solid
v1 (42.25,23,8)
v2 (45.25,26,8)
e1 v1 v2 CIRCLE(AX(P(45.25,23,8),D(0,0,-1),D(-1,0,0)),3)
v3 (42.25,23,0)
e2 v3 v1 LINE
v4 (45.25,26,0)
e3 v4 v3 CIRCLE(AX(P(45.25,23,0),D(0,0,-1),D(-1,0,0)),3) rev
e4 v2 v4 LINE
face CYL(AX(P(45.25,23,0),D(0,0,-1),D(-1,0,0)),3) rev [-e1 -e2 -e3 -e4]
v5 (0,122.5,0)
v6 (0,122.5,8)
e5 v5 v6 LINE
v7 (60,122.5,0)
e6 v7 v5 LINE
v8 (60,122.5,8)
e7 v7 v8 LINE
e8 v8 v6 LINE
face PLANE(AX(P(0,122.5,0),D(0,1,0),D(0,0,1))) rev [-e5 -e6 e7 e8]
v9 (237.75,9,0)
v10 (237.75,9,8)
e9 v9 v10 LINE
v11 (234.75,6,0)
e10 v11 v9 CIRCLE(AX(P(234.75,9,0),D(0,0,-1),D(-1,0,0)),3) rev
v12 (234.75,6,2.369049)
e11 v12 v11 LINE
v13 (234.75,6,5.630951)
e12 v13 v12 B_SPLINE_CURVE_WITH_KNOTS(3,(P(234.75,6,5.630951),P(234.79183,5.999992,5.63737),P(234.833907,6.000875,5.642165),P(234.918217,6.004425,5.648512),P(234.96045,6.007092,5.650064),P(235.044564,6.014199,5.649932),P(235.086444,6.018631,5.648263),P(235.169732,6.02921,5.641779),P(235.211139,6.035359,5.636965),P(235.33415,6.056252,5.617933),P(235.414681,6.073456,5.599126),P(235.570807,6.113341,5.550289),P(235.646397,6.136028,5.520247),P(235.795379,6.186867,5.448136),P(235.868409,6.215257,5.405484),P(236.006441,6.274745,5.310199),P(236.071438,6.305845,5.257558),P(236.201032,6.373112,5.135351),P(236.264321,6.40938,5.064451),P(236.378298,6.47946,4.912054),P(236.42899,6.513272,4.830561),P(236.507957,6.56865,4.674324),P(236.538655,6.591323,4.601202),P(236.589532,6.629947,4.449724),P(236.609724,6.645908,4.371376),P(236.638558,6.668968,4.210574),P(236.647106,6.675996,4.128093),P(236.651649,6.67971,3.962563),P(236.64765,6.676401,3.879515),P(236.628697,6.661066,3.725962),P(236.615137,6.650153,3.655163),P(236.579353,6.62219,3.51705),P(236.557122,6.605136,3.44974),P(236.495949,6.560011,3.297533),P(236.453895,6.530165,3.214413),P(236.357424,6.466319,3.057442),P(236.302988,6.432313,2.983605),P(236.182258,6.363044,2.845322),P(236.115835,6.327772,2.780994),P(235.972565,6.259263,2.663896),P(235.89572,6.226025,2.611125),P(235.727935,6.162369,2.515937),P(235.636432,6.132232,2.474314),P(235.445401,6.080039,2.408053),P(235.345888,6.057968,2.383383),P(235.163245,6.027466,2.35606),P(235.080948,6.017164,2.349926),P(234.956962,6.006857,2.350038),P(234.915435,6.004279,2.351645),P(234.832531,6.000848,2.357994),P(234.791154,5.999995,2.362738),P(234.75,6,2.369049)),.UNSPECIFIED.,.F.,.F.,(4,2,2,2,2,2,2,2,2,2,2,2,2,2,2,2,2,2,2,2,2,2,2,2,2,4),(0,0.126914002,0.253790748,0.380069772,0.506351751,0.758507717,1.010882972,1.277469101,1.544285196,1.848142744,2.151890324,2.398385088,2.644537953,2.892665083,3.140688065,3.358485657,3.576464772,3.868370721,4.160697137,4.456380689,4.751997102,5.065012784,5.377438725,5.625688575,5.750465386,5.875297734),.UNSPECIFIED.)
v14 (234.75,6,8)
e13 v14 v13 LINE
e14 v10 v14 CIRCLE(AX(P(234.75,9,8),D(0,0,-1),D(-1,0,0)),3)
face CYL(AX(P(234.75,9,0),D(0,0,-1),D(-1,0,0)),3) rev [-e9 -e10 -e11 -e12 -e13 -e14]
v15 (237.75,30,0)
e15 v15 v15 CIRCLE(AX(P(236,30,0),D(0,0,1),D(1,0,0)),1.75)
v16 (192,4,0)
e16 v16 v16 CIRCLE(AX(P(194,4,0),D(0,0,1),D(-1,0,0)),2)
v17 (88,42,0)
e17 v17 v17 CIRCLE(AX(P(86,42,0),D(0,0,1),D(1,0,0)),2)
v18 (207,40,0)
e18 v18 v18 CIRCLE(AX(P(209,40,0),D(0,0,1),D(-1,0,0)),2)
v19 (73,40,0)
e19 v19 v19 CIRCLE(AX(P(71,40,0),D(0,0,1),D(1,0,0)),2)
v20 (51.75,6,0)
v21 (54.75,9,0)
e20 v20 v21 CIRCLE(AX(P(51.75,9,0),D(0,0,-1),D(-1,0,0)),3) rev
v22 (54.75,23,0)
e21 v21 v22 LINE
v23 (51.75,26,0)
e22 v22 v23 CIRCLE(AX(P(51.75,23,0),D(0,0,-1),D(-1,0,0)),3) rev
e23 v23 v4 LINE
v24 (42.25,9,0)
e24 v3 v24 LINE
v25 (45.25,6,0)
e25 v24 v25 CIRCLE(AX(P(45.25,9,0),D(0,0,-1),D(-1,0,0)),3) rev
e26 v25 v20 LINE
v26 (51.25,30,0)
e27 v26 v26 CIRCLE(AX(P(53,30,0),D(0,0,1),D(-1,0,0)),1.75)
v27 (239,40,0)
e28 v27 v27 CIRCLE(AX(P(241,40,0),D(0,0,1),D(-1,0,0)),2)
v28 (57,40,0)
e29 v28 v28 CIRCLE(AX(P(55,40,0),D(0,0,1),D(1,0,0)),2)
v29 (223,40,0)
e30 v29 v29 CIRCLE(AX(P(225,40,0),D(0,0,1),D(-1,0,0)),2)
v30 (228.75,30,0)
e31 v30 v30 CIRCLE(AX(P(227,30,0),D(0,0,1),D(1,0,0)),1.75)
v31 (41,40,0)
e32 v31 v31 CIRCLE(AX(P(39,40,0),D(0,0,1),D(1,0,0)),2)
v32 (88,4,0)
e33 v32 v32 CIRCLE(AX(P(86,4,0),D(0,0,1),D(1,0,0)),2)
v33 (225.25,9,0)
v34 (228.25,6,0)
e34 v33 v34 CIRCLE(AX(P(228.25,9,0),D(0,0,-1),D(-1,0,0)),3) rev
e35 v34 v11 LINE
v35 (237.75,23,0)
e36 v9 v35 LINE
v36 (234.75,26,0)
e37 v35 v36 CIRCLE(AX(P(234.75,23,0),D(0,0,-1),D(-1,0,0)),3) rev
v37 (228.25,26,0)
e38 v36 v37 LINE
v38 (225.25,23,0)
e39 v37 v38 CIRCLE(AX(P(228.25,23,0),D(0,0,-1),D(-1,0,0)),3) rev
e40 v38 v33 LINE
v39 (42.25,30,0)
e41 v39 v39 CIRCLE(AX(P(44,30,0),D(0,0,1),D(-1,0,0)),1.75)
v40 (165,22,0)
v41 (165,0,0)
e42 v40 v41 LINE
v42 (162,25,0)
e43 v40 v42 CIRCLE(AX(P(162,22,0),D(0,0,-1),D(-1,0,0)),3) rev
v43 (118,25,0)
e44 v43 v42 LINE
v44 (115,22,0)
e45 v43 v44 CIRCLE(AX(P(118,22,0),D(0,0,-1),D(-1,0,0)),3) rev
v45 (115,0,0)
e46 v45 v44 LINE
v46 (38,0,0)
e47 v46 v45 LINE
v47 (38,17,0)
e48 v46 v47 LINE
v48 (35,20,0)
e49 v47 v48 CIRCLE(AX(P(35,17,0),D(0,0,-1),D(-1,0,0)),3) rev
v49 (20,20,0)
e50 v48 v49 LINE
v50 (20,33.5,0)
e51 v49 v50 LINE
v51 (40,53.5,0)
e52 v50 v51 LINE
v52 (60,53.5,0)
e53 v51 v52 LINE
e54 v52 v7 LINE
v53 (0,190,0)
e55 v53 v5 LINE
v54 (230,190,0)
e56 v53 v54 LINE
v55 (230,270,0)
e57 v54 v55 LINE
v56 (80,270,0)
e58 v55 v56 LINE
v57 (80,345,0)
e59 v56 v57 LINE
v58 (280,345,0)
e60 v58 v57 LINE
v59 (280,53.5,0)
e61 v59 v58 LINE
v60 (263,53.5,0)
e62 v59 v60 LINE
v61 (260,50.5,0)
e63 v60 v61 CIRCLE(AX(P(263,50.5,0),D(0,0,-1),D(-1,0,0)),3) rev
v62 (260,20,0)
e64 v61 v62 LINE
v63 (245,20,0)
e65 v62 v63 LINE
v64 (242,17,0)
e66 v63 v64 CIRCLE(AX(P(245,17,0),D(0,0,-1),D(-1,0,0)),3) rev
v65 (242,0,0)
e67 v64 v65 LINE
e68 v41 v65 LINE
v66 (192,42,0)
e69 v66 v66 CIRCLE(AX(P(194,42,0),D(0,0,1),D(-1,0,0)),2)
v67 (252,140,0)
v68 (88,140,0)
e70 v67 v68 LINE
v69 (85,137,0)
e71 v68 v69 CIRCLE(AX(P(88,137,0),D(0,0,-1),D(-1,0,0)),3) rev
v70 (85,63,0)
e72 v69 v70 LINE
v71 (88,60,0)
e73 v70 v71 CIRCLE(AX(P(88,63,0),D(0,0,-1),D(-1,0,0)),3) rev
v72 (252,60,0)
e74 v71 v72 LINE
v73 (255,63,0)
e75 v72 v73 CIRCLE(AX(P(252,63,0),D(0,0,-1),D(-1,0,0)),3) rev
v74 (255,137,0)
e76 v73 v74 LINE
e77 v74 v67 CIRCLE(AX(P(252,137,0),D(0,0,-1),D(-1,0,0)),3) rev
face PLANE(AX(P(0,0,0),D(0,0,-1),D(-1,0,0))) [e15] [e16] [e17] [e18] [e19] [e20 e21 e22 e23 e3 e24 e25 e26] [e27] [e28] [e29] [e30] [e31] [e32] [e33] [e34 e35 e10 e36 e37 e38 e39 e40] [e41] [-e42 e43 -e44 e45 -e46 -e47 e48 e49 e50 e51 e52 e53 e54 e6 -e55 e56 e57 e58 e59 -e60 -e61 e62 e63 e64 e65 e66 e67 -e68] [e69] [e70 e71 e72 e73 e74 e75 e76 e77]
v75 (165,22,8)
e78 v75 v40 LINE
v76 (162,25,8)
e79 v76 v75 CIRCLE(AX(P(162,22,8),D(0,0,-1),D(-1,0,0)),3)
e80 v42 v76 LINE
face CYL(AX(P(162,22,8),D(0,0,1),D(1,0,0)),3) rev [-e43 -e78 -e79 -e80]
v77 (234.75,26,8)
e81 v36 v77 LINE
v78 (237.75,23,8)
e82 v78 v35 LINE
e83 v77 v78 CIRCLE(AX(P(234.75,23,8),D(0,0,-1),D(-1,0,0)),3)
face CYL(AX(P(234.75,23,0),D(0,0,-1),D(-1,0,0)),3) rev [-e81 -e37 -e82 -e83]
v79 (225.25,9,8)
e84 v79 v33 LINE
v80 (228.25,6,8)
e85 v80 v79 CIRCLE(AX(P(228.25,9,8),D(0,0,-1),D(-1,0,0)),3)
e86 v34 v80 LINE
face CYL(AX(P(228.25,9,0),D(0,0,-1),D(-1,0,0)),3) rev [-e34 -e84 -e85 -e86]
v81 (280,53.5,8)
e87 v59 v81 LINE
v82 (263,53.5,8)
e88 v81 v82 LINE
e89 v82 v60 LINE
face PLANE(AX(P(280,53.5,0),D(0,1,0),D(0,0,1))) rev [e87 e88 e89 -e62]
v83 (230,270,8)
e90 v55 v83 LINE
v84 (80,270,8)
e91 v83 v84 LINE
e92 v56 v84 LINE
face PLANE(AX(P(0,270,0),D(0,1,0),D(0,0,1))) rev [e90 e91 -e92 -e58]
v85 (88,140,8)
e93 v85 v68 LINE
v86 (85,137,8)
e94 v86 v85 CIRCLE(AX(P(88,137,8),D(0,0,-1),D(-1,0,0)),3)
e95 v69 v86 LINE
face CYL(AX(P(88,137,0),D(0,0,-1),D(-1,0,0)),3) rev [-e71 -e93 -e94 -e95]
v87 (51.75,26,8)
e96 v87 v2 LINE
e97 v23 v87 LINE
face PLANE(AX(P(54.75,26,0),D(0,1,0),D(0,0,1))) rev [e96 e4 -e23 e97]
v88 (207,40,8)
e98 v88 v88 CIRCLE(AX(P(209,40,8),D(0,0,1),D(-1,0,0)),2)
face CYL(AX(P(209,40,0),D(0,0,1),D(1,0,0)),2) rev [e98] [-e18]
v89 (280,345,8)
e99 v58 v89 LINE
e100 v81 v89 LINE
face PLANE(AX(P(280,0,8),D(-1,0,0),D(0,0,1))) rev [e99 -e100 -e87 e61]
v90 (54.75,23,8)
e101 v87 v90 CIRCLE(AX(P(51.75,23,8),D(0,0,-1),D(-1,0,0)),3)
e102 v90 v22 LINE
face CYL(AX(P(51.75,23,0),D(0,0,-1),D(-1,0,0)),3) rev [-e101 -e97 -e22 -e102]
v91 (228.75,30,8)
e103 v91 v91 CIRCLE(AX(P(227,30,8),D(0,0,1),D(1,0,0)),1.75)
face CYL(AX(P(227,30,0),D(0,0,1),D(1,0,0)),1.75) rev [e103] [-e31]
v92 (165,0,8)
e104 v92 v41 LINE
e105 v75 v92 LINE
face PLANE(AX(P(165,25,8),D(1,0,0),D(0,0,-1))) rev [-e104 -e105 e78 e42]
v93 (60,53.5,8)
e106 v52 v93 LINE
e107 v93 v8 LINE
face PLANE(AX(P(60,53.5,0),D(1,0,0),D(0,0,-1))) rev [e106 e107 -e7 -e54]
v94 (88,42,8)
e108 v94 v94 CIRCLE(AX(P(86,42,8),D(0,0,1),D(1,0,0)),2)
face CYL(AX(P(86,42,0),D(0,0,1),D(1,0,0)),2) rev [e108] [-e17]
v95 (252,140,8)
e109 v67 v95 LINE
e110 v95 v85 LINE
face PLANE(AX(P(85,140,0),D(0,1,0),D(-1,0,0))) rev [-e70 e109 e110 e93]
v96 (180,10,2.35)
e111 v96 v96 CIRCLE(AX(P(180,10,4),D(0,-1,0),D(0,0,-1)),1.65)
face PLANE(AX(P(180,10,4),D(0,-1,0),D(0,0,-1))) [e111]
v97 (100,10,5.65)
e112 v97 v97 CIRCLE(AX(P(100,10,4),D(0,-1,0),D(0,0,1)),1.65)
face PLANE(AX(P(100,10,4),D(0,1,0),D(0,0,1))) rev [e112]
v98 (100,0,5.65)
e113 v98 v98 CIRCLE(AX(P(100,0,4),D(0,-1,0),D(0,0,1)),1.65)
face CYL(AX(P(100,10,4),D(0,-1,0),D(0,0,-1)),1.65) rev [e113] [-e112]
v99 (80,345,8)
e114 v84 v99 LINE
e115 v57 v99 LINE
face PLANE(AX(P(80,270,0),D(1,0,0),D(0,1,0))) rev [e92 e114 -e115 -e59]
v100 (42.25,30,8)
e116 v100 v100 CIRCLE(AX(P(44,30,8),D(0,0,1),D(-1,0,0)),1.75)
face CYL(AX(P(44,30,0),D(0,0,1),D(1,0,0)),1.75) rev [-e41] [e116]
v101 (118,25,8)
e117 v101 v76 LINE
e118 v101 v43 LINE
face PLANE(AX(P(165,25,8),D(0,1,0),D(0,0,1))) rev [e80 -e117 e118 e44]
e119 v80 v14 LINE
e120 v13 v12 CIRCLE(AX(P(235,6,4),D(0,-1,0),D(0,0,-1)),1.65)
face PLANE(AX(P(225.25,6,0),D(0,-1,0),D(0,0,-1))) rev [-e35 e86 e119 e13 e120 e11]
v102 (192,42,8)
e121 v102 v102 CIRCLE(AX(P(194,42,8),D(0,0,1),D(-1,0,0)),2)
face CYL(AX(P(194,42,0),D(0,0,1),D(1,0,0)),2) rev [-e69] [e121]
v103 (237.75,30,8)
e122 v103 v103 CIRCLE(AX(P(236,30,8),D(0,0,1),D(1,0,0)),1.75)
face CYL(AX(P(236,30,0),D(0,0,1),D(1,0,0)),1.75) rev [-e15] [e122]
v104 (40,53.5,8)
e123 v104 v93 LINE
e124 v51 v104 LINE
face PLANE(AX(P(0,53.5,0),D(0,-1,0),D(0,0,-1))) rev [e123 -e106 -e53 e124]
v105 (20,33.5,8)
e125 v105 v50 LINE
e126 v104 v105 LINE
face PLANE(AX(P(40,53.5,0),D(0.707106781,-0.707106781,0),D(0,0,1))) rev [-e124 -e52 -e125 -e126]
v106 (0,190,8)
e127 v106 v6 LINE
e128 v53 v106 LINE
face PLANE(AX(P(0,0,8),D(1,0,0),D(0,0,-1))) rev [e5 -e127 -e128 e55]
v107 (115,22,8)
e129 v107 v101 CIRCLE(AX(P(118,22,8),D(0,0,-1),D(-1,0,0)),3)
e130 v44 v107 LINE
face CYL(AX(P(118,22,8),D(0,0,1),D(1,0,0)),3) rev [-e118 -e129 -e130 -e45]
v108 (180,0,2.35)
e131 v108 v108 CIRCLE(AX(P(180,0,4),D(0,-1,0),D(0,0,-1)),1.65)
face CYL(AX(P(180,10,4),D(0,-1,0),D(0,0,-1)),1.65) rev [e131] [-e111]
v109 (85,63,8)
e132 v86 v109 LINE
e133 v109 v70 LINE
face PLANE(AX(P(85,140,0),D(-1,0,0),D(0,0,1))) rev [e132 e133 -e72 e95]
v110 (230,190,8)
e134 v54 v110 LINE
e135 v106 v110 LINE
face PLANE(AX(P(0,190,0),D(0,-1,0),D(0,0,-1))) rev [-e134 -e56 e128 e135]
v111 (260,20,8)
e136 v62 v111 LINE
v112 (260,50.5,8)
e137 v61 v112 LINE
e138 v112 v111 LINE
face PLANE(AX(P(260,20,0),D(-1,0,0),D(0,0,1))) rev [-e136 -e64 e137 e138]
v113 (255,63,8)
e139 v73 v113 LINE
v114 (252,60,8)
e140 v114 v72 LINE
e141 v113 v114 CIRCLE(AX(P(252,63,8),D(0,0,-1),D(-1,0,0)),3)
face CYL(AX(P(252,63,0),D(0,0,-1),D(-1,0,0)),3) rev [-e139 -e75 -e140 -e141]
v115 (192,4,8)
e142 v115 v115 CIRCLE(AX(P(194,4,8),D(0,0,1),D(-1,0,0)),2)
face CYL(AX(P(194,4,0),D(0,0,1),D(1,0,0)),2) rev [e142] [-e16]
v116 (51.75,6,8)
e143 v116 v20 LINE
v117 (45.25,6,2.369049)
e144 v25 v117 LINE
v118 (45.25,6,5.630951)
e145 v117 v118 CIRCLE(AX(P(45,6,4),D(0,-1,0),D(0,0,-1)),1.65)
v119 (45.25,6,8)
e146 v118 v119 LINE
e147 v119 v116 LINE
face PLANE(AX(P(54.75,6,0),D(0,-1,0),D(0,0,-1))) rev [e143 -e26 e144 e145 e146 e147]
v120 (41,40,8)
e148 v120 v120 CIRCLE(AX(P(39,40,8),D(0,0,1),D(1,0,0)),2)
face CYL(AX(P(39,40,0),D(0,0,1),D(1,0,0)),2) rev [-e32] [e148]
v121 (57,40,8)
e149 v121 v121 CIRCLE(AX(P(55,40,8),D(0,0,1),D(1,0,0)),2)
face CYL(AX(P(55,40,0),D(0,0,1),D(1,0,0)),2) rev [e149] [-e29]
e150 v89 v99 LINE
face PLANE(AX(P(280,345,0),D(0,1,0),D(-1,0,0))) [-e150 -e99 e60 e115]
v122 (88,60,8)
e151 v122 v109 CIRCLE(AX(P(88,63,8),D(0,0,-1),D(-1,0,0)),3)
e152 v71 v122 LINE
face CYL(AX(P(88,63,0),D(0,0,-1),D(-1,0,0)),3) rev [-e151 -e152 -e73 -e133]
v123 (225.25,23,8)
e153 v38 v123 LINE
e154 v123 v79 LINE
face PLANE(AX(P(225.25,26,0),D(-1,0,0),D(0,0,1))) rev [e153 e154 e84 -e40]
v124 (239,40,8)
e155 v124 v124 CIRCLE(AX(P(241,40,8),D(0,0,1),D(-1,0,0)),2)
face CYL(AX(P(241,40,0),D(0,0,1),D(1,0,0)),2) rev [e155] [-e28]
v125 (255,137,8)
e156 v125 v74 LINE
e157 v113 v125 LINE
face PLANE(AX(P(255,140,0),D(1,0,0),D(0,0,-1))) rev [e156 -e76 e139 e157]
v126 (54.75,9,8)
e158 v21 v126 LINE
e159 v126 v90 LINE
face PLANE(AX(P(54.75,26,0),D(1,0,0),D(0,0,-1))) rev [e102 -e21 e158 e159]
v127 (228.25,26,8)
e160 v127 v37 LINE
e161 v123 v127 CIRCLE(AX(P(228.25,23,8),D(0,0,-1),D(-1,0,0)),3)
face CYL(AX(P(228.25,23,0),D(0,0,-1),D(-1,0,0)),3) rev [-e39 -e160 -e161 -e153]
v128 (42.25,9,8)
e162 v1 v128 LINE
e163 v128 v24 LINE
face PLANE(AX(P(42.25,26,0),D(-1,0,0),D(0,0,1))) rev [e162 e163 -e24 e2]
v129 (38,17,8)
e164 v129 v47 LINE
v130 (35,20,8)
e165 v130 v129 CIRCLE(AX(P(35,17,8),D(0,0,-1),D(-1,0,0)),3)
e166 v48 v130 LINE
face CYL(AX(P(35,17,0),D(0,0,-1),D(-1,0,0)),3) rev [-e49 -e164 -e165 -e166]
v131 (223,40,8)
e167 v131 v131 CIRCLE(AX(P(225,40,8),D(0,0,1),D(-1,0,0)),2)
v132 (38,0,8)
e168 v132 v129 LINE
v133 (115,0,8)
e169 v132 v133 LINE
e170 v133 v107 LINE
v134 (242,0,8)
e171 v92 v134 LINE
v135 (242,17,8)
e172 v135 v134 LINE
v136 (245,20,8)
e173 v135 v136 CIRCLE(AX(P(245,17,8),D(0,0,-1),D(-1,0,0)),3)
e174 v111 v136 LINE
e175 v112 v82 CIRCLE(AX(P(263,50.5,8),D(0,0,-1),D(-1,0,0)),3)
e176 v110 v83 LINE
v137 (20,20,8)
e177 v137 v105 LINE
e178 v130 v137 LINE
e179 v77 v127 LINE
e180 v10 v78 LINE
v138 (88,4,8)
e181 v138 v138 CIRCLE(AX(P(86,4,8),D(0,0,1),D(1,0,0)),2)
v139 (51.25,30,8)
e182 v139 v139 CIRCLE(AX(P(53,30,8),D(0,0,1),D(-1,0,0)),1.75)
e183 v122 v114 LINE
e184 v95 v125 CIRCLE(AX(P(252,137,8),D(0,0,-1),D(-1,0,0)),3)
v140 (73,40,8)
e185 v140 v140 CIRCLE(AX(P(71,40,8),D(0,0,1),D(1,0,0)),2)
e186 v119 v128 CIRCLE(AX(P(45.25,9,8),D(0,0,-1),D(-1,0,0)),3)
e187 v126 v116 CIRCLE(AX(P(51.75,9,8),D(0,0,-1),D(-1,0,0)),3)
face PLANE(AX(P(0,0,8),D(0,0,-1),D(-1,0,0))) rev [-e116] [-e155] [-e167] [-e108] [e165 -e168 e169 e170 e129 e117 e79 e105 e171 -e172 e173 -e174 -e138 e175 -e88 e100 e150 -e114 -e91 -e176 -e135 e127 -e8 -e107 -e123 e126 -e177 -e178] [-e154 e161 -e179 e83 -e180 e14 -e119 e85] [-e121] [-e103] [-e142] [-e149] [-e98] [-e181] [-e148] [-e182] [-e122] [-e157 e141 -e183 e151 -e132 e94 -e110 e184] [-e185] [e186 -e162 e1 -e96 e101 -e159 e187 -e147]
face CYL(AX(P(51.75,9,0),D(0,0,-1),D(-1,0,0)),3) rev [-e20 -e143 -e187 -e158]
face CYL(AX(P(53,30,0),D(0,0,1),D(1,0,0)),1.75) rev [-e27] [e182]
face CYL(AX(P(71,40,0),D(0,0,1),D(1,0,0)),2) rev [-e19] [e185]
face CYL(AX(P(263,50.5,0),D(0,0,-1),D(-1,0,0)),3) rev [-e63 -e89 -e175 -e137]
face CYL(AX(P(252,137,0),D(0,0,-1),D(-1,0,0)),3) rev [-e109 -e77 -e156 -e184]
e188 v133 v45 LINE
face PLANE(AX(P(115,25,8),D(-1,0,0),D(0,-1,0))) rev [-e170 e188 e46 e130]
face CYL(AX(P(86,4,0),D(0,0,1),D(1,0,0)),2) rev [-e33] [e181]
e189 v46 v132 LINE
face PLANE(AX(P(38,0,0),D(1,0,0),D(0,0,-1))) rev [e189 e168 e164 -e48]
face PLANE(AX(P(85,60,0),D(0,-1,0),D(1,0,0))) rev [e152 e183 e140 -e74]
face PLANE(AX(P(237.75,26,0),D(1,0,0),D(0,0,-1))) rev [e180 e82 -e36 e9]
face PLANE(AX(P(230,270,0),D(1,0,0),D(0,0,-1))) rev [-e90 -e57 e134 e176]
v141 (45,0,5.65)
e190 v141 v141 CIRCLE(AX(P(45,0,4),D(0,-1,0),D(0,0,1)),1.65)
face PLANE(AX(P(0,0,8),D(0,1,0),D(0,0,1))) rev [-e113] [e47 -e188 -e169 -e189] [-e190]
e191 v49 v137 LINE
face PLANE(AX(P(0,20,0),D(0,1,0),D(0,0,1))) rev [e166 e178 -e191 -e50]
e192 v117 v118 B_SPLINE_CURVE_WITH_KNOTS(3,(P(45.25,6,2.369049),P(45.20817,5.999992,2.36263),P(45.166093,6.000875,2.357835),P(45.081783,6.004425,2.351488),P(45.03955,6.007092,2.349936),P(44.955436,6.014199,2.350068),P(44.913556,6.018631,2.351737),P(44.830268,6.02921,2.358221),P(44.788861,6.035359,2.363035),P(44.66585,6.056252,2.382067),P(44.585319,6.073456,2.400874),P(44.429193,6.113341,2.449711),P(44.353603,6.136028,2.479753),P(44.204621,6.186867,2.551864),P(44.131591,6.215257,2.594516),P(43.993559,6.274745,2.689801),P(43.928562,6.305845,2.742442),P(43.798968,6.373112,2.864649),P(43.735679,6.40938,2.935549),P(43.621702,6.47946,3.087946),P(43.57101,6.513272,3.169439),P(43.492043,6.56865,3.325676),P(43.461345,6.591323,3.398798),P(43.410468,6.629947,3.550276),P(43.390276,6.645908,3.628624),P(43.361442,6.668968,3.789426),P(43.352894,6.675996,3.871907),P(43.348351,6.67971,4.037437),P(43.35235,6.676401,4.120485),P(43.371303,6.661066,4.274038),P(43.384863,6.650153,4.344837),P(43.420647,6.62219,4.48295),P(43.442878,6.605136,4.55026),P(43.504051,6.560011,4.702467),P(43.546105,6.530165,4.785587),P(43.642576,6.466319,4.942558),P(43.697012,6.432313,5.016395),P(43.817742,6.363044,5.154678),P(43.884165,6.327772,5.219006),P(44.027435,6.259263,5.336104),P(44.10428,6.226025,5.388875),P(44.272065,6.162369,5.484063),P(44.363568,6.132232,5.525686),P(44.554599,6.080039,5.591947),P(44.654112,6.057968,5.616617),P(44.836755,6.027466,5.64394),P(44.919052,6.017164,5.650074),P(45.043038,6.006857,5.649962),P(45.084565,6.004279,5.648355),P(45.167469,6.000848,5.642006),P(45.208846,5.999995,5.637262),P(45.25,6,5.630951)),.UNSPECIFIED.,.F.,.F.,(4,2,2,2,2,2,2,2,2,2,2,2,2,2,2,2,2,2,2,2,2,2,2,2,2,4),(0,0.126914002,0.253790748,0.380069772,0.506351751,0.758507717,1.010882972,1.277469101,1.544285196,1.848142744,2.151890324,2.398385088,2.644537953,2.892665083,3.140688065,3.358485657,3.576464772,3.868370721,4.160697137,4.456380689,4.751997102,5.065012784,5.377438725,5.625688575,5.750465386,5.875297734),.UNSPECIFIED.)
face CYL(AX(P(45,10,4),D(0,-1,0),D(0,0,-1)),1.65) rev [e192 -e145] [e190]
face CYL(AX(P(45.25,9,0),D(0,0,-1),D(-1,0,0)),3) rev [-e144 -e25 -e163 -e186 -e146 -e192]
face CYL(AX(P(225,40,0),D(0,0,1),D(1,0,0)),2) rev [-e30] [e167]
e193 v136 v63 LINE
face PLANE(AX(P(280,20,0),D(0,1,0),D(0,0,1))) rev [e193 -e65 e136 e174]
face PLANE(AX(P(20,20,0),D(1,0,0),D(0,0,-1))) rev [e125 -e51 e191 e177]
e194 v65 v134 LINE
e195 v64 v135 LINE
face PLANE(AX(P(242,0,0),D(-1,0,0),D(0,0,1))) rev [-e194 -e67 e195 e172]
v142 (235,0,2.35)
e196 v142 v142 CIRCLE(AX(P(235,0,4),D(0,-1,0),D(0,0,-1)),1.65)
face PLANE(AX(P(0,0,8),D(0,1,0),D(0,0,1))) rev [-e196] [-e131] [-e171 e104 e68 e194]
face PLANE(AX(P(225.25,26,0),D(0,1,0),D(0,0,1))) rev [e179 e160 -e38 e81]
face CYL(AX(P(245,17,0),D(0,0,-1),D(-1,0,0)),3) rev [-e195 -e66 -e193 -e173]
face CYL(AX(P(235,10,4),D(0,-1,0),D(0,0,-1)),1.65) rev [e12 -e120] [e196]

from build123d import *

# Parameters (mm, degrees)
ESQUISSE1_W              = 280
ESQUISSE1_H              = 45
BOSS_EXTRU_1_DEPTH       = 8
ESQUISSE3_W              = 38
ESQUISSE3_H              = 20
ENL_V_MAT_EXTRU_2_DEPTH  = 284.705833567
ESQUISSE2_R              = 2
ENL_V_MAT_EXTRU_1_DEPTH  = 284.705833567
ESQUISSE4_R              = 2
ESQUISSE4_R_2            = 1.75
ESQUISSE4_W              = 12.5
ESQUISSE4_H              = 20
ENL_V_MAT_EXTRU_3_DEPTH  = 284.705833567
ESQUISSE5_R              = 1.65
ENL_V_MAT_EXTRU_4_DEPTH  = 10
ESQUISSE6_W              = 50
ESQUISSE6_H              = 25
ENL_V_MAT_EXTRU_5_DEPTH  = 284.705833567
ESQUISSE7_W              = 280
ESQUISSE7_H              = 300
BOSS_EXTRU_2_DEPTH       = 8
ESQUISSE8_W              = 170
ESQUISSE8_H              = 80
ENL_V_MAT_EXTRU_6_DEPTH  = 445.397344727
ESQUISSE9_W              = 60
ESQUISSE9_H              = 69
ENL_V_MAT_EXTRU_7_DEPTH  = 445.397344727
ESQUISSE10_W             = 20
ESQUISSE10_H             = 33.5
ENL_V_MAT_EXTRU_8_DEPTH  = 445.397344727
CHANFREIN1_SIZE          = 20
CONG_1_R                 = 3
ESQUISSE11_W             = 230
ESQUISSE11_H             = 80
ENL_V_MAT_EXTRU_9_DEPTH  = 445.397344728
ESQUISSE12_W             = 80
ESQUISSE12_H             = 75
ENL_V_MAT_EXTRU_10_DEPTH = 445.397344728


with BuildPart() as part:
    # Esquisse1 → Boss.-Extru.1 (new body)
    with BuildSketch(Plane.XY):
        with Locations((140, 22.5)):
            Rectangle(ESQUISSE1_W, ESQUISSE1_H)
    extrude(amount=BOSS_EXTRU_1_DEPTH)

    # Esquisse3 → Enlèv. mat.-Extru.2 (cut, through all)
    with BuildSketch(Plane.XY.offset(8)):
        with Locations((19, 10)):
            Rectangle(ESQUISSE3_W, ESQUISSE3_H)
        with Locations((261, 10)):
            Rectangle(ESQUISSE3_W, ESQUISSE3_H)
    extrude(amount=-ENL_V_MAT_EXTRU_2_DEPTH, mode=Mode.SUBTRACT)

    # Esquisse2 → Enlèv. mat.-Extru.1 (cut, through all)
    with BuildSketch(Plane.XY.offset(8)):
        with Locations((86, 4)):
            Circle(ESQUISSE2_R)
        with Locations((86, 42)):
            Circle(ESQUISSE2_R)
        with Locations(Location((194, 42, 0), (0, 0, 180))):
            Circle(ESQUISSE2_R)
        with Locations(Location((194, 4, 0), (0, 0, 180))):
            Circle(ESQUISSE2_R)
    extrude(amount=-ENL_V_MAT_EXTRU_1_DEPTH, mode=Mode.SUBTRACT)

    # Esquisse4 → Enlèv. mat.-Extru.3 (cut, through all)
    with BuildSketch(Plane.XY.offset(8)):
        with Locations((71, 40)):
            Circle(ESQUISSE4_R)
        with Locations((39, 40)):
            Circle(ESQUISSE4_R)
        with Locations((55, 40)):
            Circle(ESQUISSE4_R)
        with Locations(Location((225, 40, 0), (0, 0, 180))):
            Circle(ESQUISSE4_R)
        with Locations(Location((241, 40, 0), (0, 0, 180))):
            Circle(ESQUISSE4_R)
        with Locations(Location((209, 40, 0), (0, 0, 180))):
            Circle(ESQUISSE4_R)
        with Locations((236, 30)):
            Circle(ESQUISSE4_R_2)
        with Locations((227, 30)):
            Circle(ESQUISSE4_R_2)
        with Locations(Location((53, 30, 0), (0, 0, 180))):
            Circle(ESQUISSE4_R_2)
        with Locations(Location((44, 30, 0), (0, 0, 180))):
            Circle(ESQUISSE4_R_2)
        with Locations((231.5, 16)):
            Rectangle(ESQUISSE4_W, ESQUISSE4_H)
        with Locations((48.5, 16)):
            Rectangle(ESQUISSE4_W, ESQUISSE4_H)
    extrude(amount=-ENL_V_MAT_EXTRU_3_DEPTH, mode=Mode.SUBTRACT)

    # Esquisse5 → Enlèv. mat.-Extru.4 (cut)
    with BuildSketch(Plane(origin=(0, 0, 0), x_dir=(-1, 0, 0), z_dir=(0, -1, 0))):
        with Locations(Location((-180, -4, 0), (0, 0, 90))):
            Circle(ESQUISSE5_R)
        with Locations(Location((-235, -4, 0), (0, 0, 90))):
            Circle(ESQUISSE5_R)
        with Locations(Location((-45, -4, 0), (0, 0, 90))):
            Circle(ESQUISSE5_R)
        with Locations(Location((-100, -4, 0), (0, 0, 270))):
            Circle(ESQUISSE5_R)
    extrude(amount=-ENL_V_MAT_EXTRU_4_DEPTH, mode=Mode.SUBTRACT)

    # Esquisse6 → Enlèv. mat.-Extru.5 (cut, through all)
    with BuildSketch(Plane(origin=(0, 0, 0), x_dir=(-1, 0, 0), z_dir=(0, 0, -1))):
        with Locations((-140, 12.5)):
            Rectangle(ESQUISSE6_W, ESQUISSE6_H)
    extrude(amount=-ENL_V_MAT_EXTRU_5_DEPTH, mode=Mode.SUBTRACT)

    # Esquisse7 → Boss.-Extru.2 (add)
    with BuildSketch(Plane.XY.offset(8)):
        with Locations((140, 195)):
            Rectangle(ESQUISSE7_W, ESQUISSE7_H)
    extrude(amount=-BOSS_EXTRU_2_DEPTH)

    # Esquisse8 → Enlèv. mat.-Extru.6 (cut, through all)
    with BuildSketch(Plane.XY.offset(8)):
        with Locations((170, 100)):
            Rectangle(ESQUISSE8_W, ESQUISSE8_H)
    extrude(amount=-ENL_V_MAT_EXTRU_6_DEPTH, mode=Mode.SUBTRACT)

    # Esquisse9 → Enlèv. mat.-Extru.7 (cut, through all)
    with BuildSketch(Plane.XY.offset(8)):
        with Locations((30, 88)):
            Rectangle(ESQUISSE9_W, ESQUISSE9_H)
    extrude(amount=-ENL_V_MAT_EXTRU_7_DEPTH, mode=Mode.SUBTRACT)

    # Esquisse10 → Enlèv. mat.-Extru.8 (cut, through all)
    with BuildSketch(Plane.XY.offset(8)):
        with Locations((10, 36.75)):
            Rectangle(ESQUISSE10_W, ESQUISSE10_H)
        with Locations((270, 36.75)):
            Rectangle(ESQUISSE10_W, ESQUISSE10_H)
    extrude(amount=-ENL_V_MAT_EXTRU_8_DEPTH, mode=Mode.SUBTRACT)

    # Chanfrein1
    chanfrein1_edges = [part.edges().sort_by_distance(p)[0] for p in [
        (20, 53.5, 4),
    ]]
    chamfer(chanfrein1_edges, length=CHANFREIN1_SIZE)

    # Congé1
    # the kernel refuses this fillet: 3 mm, written as the material it adds along each edge
    with BuildSketch(Plane(origin=(165, 25, 0), x_dir=(-1, 0, 0), z_dir=(0, 0, 1)), Plane(origin=(115, 25, 0), x_dir=(0, -1, 0), z_dir=(0, 0, 1)), Plane(origin=(85, 60, 8), x_dir=(0, 1, 0), z_dir=(0, 0, -1)), Plane(origin=(255, 60, 8), x_dir=(-1, 0, 0), z_dir=(0, 0, -1)), Plane(origin=(260, 53.5, 8), x_dir=(1, 0, 0), z_dir=(0, 0, -1)), Plane(origin=(54.75, 6, 8), x_dir=(-1, 0, 0), z_dir=(0, 0, -1)), Plane(origin=(225.25, 6, 8), x_dir=(0, 1, 0), z_dir=(0, 0, -1))) as cong_1_piece_1:
        with BuildLine():
            CenterArc((CONG_1_R, CONG_1_R), CONG_1_R, 180, 90)
            Line((0, CONG_1_R), (0, 0))
            Line((0, 0), (CONG_1_R, 0))
        make_face()
    extrude(amount=8)
    with BuildSketch(Plane(origin=(38, 20, 8), x_dir=(-1, 0, 0), z_dir=(0, 0, -1)), Plane(origin=(85, 140, 8), x_dir=(0, -1, 0), z_dir=(0, 0, -1)), Plane(origin=(255, 140, 8), x_dir=(-1, 0, 0), z_dir=(0, 0, -1)), Plane(origin=(242, 20, 8), x_dir=(0, -1, 0), z_dir=(0, 0, -1)), Plane(origin=(42.25, 26, 8), x_dir=(0, -1, 0), z_dir=(0, 0, -1)), Plane(origin=(54.75, 26, 8), x_dir=(-1, 0, 0), z_dir=(0, 0, -1)), Plane(origin=(225.25, 26, 8), x_dir=(0, -1, 0), z_dir=(0, 0, -1)), Plane(origin=(237.75, 26, 8), x_dir=(-1, 0, 0), z_dir=(0, 0, -1))) as cong_1_piece_2:
        with BuildLine():
            CenterArc((CONG_1_R, -CONG_1_R), CONG_1_R, 90, 90)
            Line((0, -CONG_1_R), (0, 0))
            Line((0, 0), (CONG_1_R, 0))
        make_face()
    extrude(amount=8)
    with BuildSketch(Plane(origin=(42.25, 6, 8), x_dir=(0, 1, 0), z_dir=(0, 0, -1))) as cong_1_piece_3_section:
        with BuildLine():
            CenterArc((CONG_1_R, CONG_1_R), CONG_1_R, 180, 90)
            Line((0, CONG_1_R), (0, 0))
            Line((0, 0), (CONG_1_R, 0))
        make_face()
    cong_1_piece_3 = extrude(amount=8, mode=Mode.PRIVATE)
    cong_1_piece_3 = cong_1_piece_3 - Plane(origin=(45, 6.716481704, 4), x_dir=(0, 0, -1), z_dir=(0, -1, 0)) * Cylinder(1.65, 29, mode=Mode.PRIVATE)
    add(cong_1_piece_3)
    with BuildSketch(Plane(origin=(237.75, 6, 8), x_dir=(-1, 0, 0), z_dir=(0, 0, -1))) as cong_1_piece_4_section:
        with BuildLine():
            CenterArc((CONG_1_R, CONG_1_R), CONG_1_R, 180, 90)
            Line((0, CONG_1_R), (0, 0))
            Line((0, 0), (CONG_1_R, 0))
        make_face()
    cong_1_piece_4 = extrude(amount=8, mode=Mode.PRIVATE)
    cong_1_piece_4 = cong_1_piece_4 - Plane(origin=(235, 6.716481615, 4), x_dir=(0, 0, -1), z_dir=(0, -1, 0)) * Cylinder(1.65, 29, mode=Mode.PRIVATE)
    add(cong_1_piece_4)

    # Esquisse11 → Enlèv. mat.-Extru.9 (cut, through all)
    with BuildSketch(Plane.XY.offset(8)):
        with Locations((115, 230)):
            Rectangle(ESQUISSE11_W, ESQUISSE11_H)
    extrude(amount=-ENL_V_MAT_EXTRU_9_DEPTH, mode=Mode.SUBTRACT)

    # Esquisse12 → Enlèv. mat.-Extru.10 (cut, through all)
    with BuildSketch(Plane.XY.offset(8)):
        with Locations((40, 307.5)):
            Rectangle(ESQUISSE12_W, ESQUISSE12_H)
    extrude(amount=-ENL_V_MAT_EXTRU_10_DEPTH, mode=Mode.SUBTRACT)


solid = part.part
